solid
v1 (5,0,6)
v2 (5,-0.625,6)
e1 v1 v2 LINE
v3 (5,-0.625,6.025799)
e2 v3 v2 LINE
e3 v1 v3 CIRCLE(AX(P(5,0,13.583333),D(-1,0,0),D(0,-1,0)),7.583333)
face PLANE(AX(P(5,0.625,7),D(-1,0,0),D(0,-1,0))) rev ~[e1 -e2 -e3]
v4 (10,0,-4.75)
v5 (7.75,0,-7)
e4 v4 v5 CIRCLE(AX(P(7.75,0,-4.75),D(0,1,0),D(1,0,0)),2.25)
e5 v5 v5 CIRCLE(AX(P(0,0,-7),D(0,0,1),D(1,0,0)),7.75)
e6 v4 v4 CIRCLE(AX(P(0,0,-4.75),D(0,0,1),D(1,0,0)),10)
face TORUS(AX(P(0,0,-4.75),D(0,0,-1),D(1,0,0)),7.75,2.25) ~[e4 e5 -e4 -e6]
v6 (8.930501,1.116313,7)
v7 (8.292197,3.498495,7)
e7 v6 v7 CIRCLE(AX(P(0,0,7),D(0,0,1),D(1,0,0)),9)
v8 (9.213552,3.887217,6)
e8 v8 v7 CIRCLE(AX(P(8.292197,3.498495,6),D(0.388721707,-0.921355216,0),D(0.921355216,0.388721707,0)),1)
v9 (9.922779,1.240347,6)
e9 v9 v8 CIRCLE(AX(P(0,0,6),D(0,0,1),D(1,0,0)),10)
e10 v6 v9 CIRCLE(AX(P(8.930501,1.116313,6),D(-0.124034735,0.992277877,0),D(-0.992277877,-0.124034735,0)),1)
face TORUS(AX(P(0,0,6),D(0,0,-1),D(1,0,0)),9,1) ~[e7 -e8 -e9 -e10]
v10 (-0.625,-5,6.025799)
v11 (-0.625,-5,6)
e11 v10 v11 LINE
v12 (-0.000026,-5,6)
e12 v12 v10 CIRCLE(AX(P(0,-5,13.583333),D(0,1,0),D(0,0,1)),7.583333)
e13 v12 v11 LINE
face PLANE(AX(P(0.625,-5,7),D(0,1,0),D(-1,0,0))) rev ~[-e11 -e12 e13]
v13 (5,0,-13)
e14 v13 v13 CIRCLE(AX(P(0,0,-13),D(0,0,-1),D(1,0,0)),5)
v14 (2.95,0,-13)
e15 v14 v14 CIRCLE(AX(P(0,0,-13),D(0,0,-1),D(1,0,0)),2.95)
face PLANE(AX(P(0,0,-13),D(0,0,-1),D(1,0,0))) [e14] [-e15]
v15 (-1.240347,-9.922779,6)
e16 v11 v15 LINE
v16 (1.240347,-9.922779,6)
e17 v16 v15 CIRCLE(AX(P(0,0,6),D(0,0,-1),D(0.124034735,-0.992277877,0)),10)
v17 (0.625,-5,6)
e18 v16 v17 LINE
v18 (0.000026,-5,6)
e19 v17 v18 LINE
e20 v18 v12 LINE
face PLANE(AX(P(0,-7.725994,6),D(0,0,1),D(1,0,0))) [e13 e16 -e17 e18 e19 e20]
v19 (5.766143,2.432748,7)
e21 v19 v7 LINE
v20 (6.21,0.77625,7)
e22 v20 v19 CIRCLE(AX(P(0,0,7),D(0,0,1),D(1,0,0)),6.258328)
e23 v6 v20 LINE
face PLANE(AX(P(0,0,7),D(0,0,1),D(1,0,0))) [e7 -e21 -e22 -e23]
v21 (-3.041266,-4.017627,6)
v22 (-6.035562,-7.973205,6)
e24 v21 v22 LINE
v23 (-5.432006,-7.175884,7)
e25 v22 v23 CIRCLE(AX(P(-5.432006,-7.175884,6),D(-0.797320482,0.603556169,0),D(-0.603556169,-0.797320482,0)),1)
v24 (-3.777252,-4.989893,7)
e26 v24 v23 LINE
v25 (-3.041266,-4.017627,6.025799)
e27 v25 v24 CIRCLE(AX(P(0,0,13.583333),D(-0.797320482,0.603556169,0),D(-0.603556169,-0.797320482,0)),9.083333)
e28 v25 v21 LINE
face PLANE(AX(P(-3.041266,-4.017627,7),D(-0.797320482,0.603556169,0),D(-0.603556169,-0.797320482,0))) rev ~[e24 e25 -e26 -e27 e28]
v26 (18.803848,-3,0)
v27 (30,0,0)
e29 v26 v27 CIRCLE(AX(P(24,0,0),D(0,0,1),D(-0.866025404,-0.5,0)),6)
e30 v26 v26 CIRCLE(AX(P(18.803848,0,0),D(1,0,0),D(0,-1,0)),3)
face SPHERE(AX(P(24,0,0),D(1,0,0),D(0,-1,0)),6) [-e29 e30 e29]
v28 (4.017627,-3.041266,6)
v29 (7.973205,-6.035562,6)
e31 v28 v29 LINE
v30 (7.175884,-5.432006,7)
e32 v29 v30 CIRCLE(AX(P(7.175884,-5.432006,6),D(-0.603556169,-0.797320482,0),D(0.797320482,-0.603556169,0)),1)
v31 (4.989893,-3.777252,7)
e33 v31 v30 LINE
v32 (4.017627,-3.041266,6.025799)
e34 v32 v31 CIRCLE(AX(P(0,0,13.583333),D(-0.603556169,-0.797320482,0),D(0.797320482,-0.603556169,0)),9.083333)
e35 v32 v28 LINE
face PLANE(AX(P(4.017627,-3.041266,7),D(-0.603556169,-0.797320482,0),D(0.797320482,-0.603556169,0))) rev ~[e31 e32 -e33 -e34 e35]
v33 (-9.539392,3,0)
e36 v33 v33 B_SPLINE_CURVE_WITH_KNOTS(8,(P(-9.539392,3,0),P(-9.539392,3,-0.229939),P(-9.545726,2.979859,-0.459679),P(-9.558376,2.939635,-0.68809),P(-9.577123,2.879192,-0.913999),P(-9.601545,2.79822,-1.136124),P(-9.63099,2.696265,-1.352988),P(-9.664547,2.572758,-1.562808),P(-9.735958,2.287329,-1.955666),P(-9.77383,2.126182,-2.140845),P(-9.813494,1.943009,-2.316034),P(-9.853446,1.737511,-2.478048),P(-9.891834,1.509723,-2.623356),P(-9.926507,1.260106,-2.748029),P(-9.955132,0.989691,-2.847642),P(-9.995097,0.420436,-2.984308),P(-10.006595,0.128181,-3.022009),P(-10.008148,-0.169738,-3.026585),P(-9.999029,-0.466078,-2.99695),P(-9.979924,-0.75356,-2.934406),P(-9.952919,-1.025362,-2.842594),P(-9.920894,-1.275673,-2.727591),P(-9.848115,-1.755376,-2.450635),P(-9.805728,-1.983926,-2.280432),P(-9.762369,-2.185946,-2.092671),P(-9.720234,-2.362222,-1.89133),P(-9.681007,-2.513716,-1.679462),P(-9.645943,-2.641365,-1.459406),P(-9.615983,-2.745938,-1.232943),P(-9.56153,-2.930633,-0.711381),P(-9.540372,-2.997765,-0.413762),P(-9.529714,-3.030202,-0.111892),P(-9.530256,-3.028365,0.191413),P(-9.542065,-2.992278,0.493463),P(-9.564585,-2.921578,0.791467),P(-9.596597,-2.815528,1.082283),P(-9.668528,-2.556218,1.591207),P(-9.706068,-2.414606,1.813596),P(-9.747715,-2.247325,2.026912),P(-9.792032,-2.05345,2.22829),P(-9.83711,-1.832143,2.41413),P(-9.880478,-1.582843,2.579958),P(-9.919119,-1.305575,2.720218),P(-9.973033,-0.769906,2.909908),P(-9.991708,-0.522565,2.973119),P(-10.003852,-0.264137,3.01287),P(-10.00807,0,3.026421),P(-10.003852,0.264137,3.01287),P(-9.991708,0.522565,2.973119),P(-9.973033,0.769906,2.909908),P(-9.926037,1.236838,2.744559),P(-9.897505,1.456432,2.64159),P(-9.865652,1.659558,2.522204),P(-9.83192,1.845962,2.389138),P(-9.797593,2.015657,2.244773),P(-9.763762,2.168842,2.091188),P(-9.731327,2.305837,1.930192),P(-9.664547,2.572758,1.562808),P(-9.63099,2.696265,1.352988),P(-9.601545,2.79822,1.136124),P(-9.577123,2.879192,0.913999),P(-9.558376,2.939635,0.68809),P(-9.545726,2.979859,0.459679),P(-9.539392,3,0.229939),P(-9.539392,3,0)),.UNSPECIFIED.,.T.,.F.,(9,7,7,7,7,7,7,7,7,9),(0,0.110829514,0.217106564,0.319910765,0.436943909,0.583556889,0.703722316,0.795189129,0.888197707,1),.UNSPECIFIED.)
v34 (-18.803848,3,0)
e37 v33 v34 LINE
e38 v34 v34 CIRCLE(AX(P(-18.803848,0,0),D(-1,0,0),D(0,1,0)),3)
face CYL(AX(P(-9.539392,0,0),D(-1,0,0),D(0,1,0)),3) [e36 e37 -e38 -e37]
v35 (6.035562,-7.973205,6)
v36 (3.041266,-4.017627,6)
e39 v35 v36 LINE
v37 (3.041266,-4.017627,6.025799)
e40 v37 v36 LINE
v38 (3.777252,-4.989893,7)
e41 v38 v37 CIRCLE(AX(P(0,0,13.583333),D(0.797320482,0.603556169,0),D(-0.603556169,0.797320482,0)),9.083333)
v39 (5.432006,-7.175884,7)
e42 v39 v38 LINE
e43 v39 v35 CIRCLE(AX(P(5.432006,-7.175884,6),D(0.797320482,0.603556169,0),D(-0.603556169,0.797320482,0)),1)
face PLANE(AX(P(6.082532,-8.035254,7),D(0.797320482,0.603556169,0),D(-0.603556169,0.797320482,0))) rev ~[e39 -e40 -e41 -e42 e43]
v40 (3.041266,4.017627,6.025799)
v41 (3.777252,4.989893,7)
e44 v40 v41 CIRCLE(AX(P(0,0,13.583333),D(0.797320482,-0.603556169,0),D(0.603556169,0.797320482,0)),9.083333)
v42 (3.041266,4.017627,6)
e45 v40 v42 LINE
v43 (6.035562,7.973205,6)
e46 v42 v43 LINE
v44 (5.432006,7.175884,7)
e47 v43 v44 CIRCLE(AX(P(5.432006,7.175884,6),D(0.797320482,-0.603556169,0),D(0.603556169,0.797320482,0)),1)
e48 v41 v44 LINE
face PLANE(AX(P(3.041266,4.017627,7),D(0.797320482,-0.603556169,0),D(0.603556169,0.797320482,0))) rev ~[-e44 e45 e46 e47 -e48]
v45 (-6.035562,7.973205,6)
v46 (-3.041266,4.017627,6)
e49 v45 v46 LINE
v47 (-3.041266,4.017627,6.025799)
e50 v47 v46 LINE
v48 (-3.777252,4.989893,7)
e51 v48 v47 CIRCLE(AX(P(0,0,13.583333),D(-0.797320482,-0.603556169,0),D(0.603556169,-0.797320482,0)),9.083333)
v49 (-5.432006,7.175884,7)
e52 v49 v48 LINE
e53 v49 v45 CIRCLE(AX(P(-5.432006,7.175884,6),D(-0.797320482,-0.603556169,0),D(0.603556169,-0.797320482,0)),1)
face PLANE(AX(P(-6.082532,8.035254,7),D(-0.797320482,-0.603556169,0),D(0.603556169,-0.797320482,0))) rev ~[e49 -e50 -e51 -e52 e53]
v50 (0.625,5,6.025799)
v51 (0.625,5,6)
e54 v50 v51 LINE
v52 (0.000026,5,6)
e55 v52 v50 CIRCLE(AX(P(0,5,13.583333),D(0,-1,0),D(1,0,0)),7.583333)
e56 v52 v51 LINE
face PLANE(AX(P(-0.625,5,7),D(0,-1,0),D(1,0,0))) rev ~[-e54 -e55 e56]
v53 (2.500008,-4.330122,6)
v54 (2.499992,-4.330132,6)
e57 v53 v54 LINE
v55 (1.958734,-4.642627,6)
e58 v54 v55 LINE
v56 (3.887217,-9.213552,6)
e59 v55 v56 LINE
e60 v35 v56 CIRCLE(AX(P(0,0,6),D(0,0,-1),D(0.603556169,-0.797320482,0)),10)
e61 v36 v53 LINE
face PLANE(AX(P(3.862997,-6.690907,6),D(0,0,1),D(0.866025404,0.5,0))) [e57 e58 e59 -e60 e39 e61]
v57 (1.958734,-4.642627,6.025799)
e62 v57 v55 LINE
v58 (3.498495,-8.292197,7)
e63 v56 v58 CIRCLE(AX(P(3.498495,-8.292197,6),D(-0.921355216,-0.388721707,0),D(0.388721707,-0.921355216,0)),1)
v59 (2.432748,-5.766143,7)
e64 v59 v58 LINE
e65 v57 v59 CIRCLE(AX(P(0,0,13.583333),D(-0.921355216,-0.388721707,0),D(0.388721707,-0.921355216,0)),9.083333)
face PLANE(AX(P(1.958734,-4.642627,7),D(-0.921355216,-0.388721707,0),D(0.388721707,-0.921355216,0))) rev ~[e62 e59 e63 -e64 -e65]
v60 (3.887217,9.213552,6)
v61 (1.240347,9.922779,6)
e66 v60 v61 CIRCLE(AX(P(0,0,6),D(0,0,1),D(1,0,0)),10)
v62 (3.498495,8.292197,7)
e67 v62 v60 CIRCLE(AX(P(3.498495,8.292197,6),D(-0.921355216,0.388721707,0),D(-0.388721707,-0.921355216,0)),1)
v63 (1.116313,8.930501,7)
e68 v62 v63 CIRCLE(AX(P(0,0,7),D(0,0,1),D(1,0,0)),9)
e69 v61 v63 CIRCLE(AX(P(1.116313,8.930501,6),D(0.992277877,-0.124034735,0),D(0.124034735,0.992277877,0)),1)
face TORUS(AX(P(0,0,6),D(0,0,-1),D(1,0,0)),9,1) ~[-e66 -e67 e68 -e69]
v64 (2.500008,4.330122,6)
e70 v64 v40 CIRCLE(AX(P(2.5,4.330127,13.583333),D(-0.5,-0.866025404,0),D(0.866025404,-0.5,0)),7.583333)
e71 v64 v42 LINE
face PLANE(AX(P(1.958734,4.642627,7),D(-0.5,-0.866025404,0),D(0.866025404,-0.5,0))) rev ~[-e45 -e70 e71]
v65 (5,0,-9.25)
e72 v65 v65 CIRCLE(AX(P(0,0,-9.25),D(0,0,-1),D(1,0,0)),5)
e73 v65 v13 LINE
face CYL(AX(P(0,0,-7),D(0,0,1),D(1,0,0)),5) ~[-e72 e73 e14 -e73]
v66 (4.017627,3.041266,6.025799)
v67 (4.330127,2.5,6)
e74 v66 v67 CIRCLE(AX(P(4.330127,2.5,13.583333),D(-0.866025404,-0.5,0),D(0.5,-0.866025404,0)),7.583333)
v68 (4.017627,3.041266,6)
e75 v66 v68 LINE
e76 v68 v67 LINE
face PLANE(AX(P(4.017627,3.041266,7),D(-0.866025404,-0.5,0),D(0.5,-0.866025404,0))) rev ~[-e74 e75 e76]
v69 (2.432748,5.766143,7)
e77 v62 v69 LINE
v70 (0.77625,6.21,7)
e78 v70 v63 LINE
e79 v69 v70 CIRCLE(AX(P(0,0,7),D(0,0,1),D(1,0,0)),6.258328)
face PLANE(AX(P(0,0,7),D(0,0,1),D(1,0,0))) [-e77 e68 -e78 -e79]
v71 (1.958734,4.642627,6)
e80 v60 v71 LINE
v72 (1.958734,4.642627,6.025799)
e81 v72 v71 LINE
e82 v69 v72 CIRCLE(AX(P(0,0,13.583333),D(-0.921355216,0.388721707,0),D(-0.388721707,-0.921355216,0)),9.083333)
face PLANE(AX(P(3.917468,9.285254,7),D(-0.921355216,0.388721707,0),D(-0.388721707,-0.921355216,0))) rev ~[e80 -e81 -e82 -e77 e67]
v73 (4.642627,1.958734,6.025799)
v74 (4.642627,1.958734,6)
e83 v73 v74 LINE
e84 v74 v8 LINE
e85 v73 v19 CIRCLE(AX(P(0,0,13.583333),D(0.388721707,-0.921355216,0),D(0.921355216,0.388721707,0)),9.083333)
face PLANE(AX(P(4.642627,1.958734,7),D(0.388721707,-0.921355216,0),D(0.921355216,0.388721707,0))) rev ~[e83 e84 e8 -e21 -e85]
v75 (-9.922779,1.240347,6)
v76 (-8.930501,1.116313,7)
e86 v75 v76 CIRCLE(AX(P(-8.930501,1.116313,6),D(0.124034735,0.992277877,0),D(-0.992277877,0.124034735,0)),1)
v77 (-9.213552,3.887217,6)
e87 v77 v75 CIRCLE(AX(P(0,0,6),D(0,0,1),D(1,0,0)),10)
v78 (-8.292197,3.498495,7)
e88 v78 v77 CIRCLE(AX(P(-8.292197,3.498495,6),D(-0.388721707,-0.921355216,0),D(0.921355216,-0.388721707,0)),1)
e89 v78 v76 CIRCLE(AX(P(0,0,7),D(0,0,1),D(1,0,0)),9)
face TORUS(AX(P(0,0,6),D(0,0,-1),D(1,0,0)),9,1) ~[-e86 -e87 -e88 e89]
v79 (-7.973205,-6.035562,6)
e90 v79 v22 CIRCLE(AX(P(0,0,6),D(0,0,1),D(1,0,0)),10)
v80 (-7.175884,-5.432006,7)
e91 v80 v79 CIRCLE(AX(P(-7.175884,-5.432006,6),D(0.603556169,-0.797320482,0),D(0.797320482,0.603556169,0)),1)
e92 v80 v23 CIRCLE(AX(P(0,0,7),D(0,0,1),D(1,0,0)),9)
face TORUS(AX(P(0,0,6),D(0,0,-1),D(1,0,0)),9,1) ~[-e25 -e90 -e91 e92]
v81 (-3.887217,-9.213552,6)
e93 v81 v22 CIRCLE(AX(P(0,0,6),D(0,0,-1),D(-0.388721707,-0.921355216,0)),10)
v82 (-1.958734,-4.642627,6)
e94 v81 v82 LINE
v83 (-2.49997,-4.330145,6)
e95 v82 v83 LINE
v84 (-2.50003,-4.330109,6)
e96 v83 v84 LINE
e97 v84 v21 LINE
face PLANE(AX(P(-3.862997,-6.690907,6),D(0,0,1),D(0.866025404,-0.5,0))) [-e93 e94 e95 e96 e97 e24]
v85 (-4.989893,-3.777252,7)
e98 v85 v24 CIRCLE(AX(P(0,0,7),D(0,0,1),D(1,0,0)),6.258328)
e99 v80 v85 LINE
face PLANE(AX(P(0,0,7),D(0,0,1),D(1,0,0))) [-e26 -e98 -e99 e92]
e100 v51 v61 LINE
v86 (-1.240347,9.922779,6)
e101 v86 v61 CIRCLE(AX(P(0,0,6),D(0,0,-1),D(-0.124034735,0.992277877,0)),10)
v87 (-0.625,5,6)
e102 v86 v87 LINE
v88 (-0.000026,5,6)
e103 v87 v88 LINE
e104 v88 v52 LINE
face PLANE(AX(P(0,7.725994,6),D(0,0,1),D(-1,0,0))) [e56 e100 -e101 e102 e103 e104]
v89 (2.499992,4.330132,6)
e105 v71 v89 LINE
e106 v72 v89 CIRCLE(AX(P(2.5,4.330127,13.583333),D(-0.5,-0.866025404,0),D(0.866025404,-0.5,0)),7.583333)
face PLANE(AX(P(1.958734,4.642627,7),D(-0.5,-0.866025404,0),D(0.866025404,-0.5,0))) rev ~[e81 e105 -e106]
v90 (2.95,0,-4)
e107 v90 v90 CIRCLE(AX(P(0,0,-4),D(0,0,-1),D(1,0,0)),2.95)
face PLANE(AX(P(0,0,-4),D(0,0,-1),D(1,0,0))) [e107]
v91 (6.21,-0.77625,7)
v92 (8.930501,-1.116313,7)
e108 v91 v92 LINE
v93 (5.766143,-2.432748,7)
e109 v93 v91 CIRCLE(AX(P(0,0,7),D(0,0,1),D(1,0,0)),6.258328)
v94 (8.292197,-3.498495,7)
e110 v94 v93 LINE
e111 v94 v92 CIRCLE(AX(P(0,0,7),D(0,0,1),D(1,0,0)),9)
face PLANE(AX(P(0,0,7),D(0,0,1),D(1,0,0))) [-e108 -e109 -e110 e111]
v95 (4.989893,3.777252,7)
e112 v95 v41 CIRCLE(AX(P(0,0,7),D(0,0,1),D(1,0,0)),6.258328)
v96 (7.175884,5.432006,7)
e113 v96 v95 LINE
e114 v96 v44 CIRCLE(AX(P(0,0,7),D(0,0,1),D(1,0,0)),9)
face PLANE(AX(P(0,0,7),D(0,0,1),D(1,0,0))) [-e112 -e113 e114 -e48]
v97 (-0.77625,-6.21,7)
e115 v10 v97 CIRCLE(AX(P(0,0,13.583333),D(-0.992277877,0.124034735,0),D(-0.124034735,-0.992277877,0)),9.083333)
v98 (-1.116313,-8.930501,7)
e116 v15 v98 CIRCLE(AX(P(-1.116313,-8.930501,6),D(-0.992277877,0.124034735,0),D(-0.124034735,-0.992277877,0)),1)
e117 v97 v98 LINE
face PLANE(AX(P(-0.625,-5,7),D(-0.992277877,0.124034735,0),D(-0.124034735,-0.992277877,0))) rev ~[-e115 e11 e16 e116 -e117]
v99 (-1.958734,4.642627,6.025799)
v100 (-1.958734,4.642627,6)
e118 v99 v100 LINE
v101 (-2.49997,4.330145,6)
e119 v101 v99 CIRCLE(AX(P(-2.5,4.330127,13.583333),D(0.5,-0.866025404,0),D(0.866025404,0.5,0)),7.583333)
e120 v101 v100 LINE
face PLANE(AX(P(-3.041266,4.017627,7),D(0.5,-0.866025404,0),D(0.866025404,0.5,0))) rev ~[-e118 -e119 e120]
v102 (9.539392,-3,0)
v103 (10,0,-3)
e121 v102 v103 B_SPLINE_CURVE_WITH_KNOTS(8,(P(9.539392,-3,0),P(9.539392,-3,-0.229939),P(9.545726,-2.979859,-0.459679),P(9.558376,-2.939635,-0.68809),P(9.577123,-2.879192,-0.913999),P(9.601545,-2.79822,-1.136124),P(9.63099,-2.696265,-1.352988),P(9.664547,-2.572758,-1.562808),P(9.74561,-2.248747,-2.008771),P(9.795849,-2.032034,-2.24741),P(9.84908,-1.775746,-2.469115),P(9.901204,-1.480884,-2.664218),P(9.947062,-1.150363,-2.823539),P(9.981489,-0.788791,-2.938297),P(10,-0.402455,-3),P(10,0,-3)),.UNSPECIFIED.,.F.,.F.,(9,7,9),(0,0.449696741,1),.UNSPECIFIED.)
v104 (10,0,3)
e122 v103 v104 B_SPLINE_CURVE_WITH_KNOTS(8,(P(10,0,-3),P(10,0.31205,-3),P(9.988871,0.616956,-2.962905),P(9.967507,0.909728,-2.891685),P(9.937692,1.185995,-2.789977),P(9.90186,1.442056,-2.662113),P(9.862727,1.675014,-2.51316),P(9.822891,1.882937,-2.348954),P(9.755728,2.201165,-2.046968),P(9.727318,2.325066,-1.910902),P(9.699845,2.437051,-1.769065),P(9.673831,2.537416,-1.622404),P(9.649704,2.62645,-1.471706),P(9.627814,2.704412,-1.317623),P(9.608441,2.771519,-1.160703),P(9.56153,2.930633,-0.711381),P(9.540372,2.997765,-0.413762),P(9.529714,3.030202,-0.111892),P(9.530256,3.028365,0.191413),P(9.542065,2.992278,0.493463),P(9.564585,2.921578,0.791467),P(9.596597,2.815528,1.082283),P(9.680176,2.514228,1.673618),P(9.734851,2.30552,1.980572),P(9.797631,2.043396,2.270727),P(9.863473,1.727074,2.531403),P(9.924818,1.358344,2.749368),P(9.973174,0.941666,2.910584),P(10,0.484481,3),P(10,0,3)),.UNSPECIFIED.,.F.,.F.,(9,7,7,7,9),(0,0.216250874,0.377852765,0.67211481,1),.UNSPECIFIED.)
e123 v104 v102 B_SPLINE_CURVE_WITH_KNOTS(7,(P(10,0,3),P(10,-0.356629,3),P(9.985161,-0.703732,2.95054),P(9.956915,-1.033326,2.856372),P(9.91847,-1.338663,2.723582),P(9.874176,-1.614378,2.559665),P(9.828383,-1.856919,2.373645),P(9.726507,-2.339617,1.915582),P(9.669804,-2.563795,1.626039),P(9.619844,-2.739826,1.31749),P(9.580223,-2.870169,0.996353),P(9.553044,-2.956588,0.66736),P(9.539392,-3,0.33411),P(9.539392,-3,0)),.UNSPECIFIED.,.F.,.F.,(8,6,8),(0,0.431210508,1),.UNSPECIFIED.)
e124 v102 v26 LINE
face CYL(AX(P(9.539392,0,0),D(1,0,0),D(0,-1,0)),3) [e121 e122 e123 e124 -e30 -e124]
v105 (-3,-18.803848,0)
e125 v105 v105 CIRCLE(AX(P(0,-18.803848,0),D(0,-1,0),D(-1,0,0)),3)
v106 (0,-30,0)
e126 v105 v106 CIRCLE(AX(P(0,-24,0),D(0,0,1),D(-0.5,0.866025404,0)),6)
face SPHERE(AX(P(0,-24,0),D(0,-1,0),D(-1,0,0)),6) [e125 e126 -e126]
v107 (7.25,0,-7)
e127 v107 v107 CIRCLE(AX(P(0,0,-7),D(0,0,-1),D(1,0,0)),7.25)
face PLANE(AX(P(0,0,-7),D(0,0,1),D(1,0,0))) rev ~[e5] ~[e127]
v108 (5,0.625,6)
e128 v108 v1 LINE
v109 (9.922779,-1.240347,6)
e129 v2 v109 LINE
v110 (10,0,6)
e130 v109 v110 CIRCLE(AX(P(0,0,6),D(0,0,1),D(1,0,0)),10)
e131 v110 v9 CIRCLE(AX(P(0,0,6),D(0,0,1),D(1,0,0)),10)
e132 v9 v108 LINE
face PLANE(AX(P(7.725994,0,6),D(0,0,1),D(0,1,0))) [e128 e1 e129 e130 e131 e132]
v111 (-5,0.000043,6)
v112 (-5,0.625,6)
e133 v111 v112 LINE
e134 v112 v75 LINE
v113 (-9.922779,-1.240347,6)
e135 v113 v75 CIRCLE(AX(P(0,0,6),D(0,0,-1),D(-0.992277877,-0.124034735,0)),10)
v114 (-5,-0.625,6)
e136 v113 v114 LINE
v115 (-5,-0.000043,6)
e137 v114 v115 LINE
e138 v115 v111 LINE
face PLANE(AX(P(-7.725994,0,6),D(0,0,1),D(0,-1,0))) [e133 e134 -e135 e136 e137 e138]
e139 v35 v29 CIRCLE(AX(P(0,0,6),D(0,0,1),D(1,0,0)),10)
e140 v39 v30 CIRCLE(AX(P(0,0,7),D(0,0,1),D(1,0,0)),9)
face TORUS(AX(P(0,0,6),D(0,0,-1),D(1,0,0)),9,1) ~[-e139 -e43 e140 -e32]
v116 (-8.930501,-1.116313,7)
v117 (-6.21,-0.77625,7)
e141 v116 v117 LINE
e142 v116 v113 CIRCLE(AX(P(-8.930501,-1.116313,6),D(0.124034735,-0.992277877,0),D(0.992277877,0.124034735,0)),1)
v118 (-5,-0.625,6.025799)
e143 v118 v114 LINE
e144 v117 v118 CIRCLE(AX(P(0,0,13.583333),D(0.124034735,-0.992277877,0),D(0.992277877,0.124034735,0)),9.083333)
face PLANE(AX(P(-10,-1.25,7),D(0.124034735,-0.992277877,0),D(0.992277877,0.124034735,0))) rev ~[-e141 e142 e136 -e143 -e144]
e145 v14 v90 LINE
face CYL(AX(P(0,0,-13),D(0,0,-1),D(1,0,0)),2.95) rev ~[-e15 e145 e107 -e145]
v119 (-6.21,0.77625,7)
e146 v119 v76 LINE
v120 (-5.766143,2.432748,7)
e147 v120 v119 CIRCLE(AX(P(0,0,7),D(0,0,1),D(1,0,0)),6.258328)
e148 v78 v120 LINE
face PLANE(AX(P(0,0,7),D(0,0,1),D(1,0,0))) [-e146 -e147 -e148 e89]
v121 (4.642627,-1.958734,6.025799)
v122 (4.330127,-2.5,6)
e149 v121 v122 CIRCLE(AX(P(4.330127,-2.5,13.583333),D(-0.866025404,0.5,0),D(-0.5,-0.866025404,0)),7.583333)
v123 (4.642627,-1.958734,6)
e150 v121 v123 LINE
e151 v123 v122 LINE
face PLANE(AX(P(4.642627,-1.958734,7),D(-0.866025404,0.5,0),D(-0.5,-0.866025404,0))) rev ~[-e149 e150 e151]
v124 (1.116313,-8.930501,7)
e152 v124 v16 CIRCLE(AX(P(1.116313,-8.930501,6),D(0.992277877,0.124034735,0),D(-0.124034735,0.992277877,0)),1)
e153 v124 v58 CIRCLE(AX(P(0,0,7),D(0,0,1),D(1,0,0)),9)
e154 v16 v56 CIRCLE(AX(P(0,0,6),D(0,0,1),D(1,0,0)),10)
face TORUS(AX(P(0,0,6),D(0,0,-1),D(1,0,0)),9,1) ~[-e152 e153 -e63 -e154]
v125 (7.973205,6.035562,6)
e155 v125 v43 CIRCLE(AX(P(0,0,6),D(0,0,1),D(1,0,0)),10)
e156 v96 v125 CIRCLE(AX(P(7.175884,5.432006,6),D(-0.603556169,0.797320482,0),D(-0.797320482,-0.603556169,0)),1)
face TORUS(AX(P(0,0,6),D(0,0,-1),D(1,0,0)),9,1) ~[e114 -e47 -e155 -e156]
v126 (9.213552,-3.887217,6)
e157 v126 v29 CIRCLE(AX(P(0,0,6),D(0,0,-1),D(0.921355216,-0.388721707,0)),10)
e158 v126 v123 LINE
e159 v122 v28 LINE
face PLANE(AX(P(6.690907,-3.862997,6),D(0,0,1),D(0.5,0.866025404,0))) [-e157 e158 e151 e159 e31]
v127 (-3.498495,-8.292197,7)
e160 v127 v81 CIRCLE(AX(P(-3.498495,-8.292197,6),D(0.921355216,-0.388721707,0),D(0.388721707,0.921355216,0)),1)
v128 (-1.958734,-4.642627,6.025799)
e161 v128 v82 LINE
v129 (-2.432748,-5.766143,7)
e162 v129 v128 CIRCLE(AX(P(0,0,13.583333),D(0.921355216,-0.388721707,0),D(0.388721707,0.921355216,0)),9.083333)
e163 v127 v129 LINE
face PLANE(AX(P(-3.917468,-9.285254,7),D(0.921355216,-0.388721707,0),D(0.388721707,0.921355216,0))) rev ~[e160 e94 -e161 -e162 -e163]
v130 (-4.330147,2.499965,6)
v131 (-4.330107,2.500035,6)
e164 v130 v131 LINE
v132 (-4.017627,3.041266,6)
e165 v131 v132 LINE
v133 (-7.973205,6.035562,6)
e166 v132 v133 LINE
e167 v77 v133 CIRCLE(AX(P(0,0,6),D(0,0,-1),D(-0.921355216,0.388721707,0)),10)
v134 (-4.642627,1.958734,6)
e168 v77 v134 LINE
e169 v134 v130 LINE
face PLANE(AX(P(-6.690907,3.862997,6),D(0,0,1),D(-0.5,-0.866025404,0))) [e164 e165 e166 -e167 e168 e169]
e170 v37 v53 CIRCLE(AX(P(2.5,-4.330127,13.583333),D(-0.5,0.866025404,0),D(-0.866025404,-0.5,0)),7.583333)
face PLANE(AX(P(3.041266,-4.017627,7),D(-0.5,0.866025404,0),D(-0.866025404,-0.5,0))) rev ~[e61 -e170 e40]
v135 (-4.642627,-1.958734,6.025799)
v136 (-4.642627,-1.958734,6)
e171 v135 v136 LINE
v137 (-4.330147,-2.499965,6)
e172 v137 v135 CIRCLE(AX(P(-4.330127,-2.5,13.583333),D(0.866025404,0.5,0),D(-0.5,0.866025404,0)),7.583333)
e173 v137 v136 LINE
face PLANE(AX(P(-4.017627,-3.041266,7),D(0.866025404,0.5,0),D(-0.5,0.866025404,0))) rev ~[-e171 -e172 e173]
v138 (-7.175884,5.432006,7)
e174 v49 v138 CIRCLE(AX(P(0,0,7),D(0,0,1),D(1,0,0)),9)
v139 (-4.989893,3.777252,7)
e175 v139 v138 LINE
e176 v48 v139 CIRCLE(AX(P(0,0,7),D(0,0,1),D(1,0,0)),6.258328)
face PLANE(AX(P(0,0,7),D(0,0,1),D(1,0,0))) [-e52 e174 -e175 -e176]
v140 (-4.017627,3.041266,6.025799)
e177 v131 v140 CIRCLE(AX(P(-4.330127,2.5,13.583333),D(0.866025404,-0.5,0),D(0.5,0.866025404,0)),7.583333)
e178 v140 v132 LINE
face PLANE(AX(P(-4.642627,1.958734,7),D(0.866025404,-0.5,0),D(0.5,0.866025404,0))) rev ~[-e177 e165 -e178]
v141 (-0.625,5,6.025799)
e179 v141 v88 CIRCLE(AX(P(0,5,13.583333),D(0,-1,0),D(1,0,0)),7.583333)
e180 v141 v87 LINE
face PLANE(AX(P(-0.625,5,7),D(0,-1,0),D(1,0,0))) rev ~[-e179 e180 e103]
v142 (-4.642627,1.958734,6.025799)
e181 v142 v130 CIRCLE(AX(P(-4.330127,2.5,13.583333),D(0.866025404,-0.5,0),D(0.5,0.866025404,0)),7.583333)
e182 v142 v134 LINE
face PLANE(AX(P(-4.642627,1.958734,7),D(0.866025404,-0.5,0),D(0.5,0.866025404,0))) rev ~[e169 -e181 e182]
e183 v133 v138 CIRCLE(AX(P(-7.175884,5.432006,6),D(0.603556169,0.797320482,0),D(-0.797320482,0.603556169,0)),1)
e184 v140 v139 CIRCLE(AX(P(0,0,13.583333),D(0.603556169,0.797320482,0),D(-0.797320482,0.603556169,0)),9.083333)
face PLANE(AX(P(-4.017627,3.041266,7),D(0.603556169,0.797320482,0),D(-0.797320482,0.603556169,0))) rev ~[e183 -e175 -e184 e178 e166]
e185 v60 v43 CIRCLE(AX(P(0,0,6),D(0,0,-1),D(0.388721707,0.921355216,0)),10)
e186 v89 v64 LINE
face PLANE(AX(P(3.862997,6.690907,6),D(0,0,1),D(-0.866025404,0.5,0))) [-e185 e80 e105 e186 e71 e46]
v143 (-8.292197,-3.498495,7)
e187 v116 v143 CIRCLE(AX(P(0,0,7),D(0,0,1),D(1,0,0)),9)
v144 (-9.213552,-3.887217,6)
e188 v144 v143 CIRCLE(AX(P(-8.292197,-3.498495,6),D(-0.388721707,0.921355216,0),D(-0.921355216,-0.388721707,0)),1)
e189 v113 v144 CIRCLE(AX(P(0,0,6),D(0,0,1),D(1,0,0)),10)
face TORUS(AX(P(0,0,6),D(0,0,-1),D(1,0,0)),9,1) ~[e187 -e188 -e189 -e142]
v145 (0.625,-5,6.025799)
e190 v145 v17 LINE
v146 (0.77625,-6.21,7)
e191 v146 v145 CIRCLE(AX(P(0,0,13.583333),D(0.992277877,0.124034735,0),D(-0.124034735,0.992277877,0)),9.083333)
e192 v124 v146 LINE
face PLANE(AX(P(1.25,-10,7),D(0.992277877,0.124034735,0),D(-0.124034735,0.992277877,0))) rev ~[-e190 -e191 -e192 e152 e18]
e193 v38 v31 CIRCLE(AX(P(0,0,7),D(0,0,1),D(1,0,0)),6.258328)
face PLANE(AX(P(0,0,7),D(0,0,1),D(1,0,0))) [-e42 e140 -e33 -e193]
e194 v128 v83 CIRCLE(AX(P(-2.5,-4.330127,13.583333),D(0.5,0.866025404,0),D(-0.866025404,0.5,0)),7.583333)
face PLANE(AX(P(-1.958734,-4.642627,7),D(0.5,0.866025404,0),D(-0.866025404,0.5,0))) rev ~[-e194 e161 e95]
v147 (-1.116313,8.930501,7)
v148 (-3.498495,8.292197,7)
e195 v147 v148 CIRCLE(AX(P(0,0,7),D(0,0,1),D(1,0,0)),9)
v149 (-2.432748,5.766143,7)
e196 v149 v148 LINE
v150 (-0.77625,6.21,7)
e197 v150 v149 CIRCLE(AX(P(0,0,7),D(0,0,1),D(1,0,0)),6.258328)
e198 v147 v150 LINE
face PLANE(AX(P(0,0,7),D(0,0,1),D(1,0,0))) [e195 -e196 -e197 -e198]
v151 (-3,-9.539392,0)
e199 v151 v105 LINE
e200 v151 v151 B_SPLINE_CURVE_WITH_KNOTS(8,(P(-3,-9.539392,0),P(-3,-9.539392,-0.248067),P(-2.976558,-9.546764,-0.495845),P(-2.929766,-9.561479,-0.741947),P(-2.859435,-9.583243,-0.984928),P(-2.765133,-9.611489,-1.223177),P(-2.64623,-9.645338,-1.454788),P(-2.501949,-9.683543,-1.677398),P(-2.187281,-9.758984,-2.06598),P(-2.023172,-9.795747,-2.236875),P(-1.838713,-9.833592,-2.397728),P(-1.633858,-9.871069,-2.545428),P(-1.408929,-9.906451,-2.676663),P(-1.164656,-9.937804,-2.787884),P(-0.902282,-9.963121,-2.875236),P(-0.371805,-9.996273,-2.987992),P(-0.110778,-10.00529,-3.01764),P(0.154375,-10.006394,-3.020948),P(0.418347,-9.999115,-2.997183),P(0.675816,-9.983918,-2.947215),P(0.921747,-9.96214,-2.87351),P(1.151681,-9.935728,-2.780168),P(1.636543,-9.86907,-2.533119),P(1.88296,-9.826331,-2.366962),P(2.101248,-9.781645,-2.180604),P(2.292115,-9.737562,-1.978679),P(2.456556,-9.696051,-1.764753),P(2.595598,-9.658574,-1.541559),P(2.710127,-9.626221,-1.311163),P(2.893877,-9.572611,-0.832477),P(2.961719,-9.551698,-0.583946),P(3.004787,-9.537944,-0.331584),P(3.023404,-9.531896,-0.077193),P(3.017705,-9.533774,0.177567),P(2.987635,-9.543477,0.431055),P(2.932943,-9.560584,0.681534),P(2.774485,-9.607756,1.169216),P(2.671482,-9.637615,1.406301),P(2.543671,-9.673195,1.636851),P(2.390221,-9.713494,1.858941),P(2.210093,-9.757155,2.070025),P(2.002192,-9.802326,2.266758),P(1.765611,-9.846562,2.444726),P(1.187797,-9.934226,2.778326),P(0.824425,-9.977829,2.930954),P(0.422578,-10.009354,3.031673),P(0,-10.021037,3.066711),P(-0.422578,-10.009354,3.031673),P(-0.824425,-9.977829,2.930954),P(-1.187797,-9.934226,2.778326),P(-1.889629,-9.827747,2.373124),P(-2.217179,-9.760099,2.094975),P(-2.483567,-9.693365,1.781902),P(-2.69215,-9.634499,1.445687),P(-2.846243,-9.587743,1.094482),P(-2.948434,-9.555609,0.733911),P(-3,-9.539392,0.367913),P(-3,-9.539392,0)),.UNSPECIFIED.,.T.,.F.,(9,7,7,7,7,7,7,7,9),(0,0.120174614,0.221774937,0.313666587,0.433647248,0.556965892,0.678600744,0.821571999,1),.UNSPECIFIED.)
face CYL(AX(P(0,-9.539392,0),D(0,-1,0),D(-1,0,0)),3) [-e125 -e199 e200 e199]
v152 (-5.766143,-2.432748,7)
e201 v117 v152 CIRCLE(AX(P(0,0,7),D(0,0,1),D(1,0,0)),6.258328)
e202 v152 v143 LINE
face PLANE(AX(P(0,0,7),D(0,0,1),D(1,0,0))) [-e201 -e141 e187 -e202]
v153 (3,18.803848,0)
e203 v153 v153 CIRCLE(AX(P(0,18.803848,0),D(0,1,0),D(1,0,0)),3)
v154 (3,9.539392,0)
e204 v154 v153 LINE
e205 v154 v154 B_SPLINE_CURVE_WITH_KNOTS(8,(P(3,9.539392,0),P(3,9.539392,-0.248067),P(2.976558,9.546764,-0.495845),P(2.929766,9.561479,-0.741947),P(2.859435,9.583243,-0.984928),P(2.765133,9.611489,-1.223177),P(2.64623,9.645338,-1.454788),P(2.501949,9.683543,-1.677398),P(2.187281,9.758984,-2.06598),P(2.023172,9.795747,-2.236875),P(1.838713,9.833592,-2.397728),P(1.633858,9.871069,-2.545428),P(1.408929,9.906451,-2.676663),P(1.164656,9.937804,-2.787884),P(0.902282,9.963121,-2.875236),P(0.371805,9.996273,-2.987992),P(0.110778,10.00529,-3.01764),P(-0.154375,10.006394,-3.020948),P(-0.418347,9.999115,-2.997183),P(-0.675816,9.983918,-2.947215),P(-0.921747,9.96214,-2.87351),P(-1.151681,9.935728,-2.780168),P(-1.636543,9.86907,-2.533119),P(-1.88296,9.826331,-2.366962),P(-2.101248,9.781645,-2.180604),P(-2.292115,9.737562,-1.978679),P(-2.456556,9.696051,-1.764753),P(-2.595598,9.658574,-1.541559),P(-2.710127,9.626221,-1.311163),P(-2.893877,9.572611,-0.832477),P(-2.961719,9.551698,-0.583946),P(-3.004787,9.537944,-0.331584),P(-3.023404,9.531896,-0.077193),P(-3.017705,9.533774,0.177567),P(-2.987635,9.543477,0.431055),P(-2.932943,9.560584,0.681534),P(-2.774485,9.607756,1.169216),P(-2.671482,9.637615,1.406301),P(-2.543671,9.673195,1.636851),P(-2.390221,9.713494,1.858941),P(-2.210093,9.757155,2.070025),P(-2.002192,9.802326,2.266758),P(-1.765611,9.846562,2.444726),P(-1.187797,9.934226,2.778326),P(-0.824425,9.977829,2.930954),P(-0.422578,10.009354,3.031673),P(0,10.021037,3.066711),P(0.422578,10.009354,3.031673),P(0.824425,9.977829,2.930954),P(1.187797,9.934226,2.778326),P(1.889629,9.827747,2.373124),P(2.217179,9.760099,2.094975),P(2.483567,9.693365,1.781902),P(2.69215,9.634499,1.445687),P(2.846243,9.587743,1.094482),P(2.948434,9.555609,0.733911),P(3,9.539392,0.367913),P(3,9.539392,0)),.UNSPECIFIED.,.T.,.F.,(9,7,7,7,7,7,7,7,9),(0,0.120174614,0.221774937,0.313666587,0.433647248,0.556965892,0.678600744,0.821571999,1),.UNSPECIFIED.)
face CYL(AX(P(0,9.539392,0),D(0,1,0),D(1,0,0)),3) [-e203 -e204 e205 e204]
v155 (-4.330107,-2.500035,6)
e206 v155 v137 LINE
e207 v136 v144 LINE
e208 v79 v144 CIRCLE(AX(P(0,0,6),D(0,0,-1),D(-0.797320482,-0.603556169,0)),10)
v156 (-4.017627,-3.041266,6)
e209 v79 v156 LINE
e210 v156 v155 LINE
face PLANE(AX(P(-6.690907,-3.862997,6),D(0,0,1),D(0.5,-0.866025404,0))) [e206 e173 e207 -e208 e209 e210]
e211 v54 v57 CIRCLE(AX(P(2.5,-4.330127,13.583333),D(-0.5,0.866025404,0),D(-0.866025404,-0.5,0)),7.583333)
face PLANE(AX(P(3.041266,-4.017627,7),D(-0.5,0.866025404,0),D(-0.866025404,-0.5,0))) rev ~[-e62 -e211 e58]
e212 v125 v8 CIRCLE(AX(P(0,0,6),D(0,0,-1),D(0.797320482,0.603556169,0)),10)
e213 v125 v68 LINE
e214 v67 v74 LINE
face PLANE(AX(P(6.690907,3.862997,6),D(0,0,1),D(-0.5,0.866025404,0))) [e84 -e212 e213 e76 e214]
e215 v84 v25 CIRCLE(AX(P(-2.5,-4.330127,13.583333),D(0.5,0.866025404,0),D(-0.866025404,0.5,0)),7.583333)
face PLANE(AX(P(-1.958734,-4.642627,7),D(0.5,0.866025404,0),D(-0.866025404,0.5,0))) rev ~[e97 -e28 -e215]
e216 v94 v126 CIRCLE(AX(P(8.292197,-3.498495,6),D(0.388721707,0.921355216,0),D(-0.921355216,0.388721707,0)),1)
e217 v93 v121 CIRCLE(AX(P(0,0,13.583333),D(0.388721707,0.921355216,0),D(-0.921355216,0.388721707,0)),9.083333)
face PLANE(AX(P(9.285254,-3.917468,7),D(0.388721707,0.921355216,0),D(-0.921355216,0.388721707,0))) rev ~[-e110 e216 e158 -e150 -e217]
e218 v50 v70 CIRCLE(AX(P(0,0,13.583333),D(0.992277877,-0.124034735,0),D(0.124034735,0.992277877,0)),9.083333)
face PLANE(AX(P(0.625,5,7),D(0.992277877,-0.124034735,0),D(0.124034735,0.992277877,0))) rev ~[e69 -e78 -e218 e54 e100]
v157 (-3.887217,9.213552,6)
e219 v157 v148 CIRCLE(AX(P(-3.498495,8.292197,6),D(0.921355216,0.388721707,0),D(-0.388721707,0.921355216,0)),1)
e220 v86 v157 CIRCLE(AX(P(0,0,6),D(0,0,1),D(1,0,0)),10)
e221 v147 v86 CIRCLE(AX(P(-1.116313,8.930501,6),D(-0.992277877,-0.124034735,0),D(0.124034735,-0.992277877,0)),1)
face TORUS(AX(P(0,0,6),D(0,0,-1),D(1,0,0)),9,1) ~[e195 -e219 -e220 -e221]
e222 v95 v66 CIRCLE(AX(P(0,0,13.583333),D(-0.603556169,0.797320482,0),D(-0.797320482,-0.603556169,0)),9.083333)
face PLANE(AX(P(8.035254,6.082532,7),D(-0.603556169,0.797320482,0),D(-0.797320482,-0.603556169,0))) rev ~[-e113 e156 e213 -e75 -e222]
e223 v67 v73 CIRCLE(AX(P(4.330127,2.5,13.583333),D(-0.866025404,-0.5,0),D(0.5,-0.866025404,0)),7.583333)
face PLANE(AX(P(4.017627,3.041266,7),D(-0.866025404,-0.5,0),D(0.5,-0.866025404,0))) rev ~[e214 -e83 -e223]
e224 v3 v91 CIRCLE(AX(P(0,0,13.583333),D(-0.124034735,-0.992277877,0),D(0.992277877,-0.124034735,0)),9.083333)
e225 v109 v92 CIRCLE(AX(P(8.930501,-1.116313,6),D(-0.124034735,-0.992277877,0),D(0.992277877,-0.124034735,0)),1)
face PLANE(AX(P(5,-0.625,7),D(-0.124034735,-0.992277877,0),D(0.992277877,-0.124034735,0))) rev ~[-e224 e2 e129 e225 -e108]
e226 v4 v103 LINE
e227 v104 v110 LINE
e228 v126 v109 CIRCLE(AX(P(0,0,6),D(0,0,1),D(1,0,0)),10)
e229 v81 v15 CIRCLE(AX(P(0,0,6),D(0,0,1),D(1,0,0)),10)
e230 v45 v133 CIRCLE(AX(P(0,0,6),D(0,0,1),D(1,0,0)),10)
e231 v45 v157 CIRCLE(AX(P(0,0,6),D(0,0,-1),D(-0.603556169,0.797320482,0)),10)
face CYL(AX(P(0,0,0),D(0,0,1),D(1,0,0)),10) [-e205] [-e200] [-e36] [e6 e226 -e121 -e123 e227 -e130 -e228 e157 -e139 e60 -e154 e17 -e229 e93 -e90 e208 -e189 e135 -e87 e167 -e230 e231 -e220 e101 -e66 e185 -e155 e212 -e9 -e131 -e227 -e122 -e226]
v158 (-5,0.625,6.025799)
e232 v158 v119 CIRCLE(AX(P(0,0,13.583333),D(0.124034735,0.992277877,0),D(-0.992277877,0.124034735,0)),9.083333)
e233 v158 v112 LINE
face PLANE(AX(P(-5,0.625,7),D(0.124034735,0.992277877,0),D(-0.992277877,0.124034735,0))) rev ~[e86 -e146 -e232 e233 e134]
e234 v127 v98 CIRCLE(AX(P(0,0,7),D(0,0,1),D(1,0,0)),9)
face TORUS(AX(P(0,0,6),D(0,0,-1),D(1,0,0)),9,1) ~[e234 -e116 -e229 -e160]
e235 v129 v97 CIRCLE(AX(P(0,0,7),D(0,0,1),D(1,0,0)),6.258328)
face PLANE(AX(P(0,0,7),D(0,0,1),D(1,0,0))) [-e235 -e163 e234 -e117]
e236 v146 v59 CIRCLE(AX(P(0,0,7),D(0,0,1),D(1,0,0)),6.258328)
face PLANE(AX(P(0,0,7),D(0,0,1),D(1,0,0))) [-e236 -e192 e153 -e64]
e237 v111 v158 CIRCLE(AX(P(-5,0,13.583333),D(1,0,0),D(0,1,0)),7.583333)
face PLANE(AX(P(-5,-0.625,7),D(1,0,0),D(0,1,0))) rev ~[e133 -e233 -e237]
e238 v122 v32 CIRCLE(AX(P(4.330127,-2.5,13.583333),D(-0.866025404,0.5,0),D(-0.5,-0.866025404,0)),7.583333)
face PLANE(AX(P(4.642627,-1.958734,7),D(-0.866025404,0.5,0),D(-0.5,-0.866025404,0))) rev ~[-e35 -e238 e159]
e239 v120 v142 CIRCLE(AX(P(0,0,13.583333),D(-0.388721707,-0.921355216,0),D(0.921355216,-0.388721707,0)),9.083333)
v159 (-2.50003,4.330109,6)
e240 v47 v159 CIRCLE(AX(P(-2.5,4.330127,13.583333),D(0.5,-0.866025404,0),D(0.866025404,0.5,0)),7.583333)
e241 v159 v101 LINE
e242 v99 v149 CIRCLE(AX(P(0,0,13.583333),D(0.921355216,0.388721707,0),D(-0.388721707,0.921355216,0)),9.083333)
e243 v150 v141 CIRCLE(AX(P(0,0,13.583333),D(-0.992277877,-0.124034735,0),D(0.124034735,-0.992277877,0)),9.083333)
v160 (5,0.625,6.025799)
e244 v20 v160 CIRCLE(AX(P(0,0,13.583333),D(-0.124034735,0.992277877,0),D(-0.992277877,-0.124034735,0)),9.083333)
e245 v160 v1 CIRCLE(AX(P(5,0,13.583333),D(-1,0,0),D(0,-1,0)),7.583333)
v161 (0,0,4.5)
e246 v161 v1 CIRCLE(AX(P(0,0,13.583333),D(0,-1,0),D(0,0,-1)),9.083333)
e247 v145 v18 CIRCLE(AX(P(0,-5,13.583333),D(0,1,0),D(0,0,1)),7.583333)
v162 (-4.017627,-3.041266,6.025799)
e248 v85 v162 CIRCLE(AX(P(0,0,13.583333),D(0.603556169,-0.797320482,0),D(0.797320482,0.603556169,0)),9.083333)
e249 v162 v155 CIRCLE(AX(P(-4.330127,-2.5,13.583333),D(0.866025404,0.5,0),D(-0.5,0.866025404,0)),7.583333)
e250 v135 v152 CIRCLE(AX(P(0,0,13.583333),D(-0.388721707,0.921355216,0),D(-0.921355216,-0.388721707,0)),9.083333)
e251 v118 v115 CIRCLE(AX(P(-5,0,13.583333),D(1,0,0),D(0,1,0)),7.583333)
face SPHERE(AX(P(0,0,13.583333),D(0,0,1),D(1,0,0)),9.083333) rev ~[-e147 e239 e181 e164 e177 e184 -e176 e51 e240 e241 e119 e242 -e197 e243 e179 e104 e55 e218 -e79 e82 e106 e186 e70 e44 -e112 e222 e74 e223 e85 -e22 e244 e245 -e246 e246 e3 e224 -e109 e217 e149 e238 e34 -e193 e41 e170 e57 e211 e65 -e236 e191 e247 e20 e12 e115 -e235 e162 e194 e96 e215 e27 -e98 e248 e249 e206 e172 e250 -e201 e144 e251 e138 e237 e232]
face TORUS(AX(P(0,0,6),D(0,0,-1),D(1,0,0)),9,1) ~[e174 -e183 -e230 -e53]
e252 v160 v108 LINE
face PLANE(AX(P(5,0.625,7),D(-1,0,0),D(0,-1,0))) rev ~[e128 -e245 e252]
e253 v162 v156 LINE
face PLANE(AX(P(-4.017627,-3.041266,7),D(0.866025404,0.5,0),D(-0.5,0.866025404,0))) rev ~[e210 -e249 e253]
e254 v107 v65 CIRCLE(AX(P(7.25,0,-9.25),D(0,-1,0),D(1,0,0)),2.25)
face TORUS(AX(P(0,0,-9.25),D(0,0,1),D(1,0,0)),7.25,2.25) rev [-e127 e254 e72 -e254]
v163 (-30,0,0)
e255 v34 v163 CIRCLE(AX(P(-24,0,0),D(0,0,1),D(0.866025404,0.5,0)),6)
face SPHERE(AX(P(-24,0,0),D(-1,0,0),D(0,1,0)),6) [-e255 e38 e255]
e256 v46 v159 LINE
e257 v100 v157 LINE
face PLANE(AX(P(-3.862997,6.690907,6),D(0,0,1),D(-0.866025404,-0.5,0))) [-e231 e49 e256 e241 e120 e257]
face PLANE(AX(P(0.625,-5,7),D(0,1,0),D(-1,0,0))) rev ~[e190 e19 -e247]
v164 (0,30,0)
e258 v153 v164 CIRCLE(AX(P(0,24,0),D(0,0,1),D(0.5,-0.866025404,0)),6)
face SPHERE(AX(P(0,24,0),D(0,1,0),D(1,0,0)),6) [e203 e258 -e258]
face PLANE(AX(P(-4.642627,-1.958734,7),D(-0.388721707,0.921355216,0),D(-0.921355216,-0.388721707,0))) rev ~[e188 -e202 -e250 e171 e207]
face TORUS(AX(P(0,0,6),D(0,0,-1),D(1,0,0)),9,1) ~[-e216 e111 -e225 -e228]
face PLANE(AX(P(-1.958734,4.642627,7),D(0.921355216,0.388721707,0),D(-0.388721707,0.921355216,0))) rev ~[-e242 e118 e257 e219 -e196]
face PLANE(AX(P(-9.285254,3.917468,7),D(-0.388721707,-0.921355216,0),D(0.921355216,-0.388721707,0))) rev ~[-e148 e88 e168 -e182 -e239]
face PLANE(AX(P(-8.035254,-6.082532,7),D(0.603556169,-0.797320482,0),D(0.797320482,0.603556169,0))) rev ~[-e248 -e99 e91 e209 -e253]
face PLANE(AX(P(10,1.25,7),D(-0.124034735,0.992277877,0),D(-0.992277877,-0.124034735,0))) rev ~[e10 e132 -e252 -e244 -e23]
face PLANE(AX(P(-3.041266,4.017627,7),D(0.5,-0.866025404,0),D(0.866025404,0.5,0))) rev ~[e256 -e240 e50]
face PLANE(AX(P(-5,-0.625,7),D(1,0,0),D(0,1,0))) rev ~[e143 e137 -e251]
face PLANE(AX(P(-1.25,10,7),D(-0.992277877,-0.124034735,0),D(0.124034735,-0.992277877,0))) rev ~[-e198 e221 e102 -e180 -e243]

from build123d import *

# Parameters (mm, degrees)
F0_R            = 10
F1_DEPTH        = 7
F2_R            = 5
F3_DEPTH        = 6
F4_R            = 2.95
F5_DEPTH        = 9
F7_COPIES_COUNT = 4
F9_DEPTH        = 1
F9_COPIES_COUNT = 12
F12_R           = 2.25


# Not quite as in the source:
# - a pattern or mirror of a feature is missing from the dataset's text; its kind, count and spacing are read off the source's solid


with BuildPart() as f1:
    # F0 (on Top) → F1 (new body, symmetric)
    with BuildSketch(Plane.XY):
        Circle(F0_R)
    extrude(amount=F1_DEPTH, both=True)

    # F2 (on face) → F3 (join)
    with BuildSketch(Plane(origin=(0, 0, -7), x_dir=(1, 0, 0), z_dir=(0, 0, -1))):
        Circle(F2_R)
    extrude(amount=F3_DEPTH)

    # F4 (on face) → F5 (cut)
    with BuildSketch(Plane(origin=(0, 0, -13), x_dir=(1, 0, 0), z_dir=(0, 0, -1))):
        Circle(F4_R)
    extrude(amount=-F5_DEPTH, mode=Mode.SUBTRACT)

    # F6 (on Top) → F7 (revolve)
    with BuildSketch(Plane.XY):
        with BuildLine():
            Line((0, -30), (0, -9.5393920142))
            Line((0, -9.5393920142), (-3, -9.5393920142))
            Line((-3, -9.5393920142), (-3, -18.8038475773))
            ThreePointArc((-3, -18.8038475773), (-5.7955549577, -25.5529142706), (0, -30))
        make_face()
    f7 = revolve(axis=Axis((0, -23.260904476, 0), (0, -1, 0)))

    # F7_copies: F7 ×4 about axis
    f7_copies_axis = Axis((0, 0, 0), (0, 0, 1))
    for i in range(1, F7_COPIES_COUNT):
        add(f7.rotate(f7_copies_axis, i * 360 / F7_COPIES_COUNT))

    # F8 (on face) → F9 (cut)
    with BuildSketch(Plane.XY.offset(7)):
        Polygon((-0.625, -5), (-1.25, -10), (1.25, -10), (0.625, -5), align=None)
    f9 = extrude(amount=-F9_DEPTH, mode=Mode.SUBTRACT)

    # F9_copies: F9 ×12 about axis
    f9_copies_axis = Axis((0, 0, 0), (0, 0, 1))
    for i in range(1, F9_COPIES_COUNT):
        add(f9.rotate(f9_copies_axis, i * 360 / F9_COPIES_COUNT), mode=Mode.SUBTRACT)

    # F10 (on Front) → F11 (revolve, cut)
    with BuildSketch(Plane.XZ):
        with BuildLine():
            Line((0, 13.5833333333), (0, 4.5))
            ThreePointArc((0, 4.5), (3.6912057651, 5.283818622), (6.7453687816, 7.5))
            Line((6.7453687816, 7.5), (9, 7.5))
            Line((9, 7.5), (9, 7))
            ThreePointArc((9, 7), (9.7071067812, 6.7071067812), (10, 6))
            Line((10, 6), (12.8776788814, 6))
            Line((12.8776788814, 6), (0, 13.5833333333))
        make_face()
    revolve(axis=Axis((0, 0, 9.0416666667), (0, 0, 1)), mode=Mode.SUBTRACT)

    # F12
    f12_edges = [f1.edges().sort_by_distance(p)[0] for p in [
        (-10, 0, -7),
        (-5, 0, -7),
    ]]
    fillet(f12_edges, radius=F12_R)


solid = f1.part
